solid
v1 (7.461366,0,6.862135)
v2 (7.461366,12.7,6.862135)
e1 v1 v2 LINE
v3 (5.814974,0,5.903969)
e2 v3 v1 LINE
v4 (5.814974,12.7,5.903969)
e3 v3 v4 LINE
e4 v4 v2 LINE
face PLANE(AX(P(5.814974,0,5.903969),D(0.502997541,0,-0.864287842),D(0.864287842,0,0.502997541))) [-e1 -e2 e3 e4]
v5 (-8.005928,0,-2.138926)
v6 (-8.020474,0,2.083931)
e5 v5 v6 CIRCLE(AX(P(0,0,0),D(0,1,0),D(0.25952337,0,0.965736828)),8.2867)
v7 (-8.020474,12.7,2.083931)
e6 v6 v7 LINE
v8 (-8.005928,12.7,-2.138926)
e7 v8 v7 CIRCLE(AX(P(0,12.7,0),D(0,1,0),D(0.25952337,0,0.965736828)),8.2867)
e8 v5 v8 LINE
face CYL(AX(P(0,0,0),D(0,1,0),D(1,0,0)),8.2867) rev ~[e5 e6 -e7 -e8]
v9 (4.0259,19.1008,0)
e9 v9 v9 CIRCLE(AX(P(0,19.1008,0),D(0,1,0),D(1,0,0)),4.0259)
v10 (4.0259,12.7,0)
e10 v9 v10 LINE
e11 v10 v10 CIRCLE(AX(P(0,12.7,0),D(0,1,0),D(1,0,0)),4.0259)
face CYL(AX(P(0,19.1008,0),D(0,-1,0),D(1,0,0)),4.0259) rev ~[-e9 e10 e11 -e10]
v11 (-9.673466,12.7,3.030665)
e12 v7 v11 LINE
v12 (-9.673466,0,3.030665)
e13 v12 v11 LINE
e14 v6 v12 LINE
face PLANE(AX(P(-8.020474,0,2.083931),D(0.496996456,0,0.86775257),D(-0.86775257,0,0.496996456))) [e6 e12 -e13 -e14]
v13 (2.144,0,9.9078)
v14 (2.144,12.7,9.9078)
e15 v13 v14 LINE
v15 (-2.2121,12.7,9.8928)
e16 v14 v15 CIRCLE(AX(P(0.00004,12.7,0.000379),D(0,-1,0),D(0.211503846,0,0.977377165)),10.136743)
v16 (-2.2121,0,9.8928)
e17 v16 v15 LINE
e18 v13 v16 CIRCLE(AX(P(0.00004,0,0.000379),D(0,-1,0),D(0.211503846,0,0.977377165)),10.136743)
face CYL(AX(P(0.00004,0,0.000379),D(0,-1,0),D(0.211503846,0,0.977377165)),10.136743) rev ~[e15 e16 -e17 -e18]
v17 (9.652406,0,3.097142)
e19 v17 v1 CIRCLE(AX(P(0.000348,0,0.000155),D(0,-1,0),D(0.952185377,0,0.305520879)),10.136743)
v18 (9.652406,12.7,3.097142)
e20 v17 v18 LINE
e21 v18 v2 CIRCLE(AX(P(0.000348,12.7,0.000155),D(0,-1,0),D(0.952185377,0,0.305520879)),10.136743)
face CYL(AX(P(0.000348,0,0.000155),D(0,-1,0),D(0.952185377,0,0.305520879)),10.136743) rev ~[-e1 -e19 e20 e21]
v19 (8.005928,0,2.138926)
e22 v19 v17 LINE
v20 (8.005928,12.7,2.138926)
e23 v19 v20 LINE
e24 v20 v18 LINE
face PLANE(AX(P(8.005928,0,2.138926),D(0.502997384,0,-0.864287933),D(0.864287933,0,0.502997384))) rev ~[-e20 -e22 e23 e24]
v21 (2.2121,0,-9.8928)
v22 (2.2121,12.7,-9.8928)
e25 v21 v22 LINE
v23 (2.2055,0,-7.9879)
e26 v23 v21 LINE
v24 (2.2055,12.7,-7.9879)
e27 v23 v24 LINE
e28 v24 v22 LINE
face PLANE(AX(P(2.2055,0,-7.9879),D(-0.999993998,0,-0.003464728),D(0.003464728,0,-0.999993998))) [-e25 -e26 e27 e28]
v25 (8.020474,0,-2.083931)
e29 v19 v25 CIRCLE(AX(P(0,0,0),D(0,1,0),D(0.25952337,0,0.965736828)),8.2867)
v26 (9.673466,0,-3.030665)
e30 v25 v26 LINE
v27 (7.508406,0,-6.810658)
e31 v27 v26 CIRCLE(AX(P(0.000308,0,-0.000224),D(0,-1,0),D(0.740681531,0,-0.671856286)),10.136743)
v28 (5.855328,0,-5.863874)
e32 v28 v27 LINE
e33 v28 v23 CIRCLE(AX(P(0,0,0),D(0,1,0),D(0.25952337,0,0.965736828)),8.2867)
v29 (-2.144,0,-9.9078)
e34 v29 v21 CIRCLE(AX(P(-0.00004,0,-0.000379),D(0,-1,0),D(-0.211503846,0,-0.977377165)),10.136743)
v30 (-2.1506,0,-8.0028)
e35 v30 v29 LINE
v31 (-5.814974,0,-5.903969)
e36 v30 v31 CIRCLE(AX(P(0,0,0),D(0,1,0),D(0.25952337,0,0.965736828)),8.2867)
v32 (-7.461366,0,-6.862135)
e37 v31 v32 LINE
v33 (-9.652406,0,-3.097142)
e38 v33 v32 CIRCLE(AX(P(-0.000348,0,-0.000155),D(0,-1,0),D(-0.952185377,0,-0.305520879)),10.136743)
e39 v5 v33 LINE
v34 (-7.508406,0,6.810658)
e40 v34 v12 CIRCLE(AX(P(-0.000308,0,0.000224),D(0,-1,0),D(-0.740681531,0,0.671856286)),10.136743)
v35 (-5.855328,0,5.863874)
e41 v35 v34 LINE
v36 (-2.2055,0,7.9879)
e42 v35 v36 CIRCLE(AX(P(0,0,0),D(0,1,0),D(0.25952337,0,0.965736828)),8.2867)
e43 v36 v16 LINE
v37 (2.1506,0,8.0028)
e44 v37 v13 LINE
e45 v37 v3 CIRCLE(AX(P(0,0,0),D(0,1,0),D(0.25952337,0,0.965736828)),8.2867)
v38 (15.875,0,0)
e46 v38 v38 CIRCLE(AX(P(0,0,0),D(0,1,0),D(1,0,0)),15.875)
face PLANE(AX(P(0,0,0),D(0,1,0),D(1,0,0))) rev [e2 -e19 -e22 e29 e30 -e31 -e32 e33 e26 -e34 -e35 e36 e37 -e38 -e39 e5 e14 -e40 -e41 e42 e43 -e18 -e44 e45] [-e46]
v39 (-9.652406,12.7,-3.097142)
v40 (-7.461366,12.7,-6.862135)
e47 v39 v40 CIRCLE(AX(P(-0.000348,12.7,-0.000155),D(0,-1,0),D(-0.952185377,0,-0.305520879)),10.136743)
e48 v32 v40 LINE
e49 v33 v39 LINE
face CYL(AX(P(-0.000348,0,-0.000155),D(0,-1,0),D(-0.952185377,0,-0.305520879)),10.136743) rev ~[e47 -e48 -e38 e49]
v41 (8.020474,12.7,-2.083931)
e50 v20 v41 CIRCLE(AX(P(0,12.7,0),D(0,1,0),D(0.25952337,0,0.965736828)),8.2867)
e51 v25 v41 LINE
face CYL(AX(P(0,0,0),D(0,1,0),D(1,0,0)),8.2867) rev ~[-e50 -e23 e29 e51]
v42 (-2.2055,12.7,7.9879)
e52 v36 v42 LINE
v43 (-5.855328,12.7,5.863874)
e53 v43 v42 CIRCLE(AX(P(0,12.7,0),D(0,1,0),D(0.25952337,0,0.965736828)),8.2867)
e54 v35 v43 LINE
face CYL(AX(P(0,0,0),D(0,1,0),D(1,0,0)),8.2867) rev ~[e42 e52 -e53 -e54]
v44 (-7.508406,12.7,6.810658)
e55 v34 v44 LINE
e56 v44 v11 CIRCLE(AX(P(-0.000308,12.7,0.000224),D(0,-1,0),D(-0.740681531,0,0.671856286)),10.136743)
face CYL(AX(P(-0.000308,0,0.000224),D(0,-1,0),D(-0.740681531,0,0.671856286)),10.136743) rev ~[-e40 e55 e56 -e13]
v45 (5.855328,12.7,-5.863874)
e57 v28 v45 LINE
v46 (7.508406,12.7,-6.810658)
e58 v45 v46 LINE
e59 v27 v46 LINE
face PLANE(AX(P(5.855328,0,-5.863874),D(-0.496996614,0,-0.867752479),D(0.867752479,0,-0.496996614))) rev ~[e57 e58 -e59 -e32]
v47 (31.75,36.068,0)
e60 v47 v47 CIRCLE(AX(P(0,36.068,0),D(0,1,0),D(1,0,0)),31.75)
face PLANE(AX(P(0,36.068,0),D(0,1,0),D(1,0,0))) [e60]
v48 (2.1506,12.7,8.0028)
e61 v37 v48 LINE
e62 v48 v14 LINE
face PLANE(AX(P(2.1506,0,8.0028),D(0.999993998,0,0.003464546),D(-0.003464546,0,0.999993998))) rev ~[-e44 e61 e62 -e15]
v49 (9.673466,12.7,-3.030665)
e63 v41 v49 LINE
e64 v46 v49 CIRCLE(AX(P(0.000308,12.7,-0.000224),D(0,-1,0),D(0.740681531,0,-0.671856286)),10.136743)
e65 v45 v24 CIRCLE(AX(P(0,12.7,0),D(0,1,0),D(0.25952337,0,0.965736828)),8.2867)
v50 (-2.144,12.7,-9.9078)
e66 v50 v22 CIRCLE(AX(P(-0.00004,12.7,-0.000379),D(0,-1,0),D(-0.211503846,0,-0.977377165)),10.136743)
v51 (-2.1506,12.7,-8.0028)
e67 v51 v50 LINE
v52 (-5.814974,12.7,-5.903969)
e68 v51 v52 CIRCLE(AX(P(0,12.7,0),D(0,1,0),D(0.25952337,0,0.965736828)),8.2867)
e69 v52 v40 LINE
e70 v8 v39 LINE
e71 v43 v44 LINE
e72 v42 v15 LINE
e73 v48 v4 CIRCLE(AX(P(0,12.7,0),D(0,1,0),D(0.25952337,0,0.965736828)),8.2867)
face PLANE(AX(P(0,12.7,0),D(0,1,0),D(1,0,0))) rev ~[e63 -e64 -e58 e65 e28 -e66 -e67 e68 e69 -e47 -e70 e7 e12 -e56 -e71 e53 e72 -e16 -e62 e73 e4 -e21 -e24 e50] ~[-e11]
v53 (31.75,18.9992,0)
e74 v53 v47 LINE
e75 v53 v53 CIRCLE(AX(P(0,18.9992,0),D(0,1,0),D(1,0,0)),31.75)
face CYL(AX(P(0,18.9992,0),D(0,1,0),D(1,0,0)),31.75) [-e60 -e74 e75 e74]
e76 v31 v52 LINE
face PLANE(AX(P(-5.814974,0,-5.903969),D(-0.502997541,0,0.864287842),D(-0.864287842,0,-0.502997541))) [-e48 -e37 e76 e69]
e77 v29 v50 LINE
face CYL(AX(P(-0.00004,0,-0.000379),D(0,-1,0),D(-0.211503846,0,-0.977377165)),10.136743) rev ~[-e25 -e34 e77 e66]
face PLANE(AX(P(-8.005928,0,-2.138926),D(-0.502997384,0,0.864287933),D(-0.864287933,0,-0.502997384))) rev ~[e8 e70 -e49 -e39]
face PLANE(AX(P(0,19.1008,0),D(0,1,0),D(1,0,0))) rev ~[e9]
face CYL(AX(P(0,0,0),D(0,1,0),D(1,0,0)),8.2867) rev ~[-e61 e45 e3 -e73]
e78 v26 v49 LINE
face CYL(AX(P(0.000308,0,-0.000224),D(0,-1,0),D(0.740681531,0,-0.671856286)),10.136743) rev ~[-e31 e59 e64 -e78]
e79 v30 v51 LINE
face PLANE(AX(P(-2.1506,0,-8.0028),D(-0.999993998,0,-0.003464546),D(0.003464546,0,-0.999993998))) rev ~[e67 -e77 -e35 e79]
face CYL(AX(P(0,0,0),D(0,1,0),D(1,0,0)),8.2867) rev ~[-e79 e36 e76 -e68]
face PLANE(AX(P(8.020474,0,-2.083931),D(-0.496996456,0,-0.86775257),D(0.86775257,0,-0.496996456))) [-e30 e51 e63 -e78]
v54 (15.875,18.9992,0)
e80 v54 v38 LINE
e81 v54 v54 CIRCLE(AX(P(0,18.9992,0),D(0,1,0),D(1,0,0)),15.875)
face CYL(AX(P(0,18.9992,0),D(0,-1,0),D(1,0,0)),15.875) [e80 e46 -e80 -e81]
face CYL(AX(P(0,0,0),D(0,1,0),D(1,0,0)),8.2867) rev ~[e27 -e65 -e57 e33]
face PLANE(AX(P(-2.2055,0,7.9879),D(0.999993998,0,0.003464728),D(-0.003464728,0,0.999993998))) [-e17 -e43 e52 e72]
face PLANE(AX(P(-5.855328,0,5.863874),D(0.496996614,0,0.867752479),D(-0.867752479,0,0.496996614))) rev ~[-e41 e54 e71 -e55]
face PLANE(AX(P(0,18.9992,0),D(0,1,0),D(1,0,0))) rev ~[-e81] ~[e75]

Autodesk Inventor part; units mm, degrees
ref_plane "YZ Plane" through (0, 0, 0) normal (1, 0, 0) x (0, 1, 0)
ref_plane "XZ Plane" through (0, 0, 0) normal (0, 1, 0) x (-1, 0, 0)
ref_plane "XY Plane" through (0, 0, 0) normal (0, 0, 1) x (1, 0, 0)
sketch "Sketch1" plane through (0, 0, 0) normal (0, 0, 1) x (1, 0, 0)
  line L0 (0, 0) -> (0, 50.8) construction
  line L1 (0, 0) -> (50.8, 0) construction
  line L2 (31.75, 18.9992) -> (31.75, 19.1008)
  line L3 (0, 9.5479) -> (15.8115, 9.5479) construction
  line L4 (31.75, 18.9992) -> (15.875, 18.9992)
  line L5 (15.875, 18.9992) -> (15.875, 0)
  line L6 (0, 0) -> (8.2867, 0) construction
  line L7 (8.2867, 0) -> (15.875, 0)
  line L8 (8.2867, 0) -> (8.2867, 12.7)
  line L9 (4.0259, 71.0633) -> (4.0259, -11.3243) construction
  line L10 (8.2867, 12.7) -> (4.0259, 12.7)
  line L11 (4.0259, 19.1008) -> (4.0259, 12.7)
  line L12 (31.75, 36.068) -> (31.75, 19.1008)
  line L13 (31.75, 36.068) -> (0, 36.068)
  line L14 (4.0259, 19.1008) -> (0, 19.1008)
  line L15 (0, 36.068) -> (0, 19.1008)
  dimension "d12" = 15.8115
  dimension "d15" = 8.2867
  dimension "d55" = 4.0259
  dimension "d56" = 12.7
  dimension "d95" = 6.4008
revolve "Revolution1" add sketch "Sketch1" angle 360 about axis through (0, 0, 0) along (0, 1, 0)
sketch "Sketch2" plane through (0, 0, 0) normal (0, -1, 0) x (1, 0, 0)
  circle A0 centre (0, 0) radius 8.2867 construction
  line L0 (-2.2055, 7.9879) -> (-2.2121, 9.8928)
  circle A1 centre (0, 0) radius 10.1371 construction
  line L1 (2.1506, 8.0028) -> (2.144, 9.9078)
  line L2 (-2.2055, 7.9879) -> (2.1506, 8.0028) construction
  arc A2 (2.144, 9.9078) -> (-2.2121, 9.8928) centre (0, 0) ccw
  arc A3 (2.1506, 8.0028) -> (-2.2055, 7.9879) centre (0, 0) ccw
  dimension "d43" = 1.905
  dimension "d44" = 4.3561
extrude "Extrusion1" cut sketch "Sketch2" against normal blind 12.7
pattern_circular "Circular Pattern2" count 6 over 360 about axis through (0, 6.35, 0) along (0, -1, 0) of "Extrusion1"
properties part number "denso-basic"
